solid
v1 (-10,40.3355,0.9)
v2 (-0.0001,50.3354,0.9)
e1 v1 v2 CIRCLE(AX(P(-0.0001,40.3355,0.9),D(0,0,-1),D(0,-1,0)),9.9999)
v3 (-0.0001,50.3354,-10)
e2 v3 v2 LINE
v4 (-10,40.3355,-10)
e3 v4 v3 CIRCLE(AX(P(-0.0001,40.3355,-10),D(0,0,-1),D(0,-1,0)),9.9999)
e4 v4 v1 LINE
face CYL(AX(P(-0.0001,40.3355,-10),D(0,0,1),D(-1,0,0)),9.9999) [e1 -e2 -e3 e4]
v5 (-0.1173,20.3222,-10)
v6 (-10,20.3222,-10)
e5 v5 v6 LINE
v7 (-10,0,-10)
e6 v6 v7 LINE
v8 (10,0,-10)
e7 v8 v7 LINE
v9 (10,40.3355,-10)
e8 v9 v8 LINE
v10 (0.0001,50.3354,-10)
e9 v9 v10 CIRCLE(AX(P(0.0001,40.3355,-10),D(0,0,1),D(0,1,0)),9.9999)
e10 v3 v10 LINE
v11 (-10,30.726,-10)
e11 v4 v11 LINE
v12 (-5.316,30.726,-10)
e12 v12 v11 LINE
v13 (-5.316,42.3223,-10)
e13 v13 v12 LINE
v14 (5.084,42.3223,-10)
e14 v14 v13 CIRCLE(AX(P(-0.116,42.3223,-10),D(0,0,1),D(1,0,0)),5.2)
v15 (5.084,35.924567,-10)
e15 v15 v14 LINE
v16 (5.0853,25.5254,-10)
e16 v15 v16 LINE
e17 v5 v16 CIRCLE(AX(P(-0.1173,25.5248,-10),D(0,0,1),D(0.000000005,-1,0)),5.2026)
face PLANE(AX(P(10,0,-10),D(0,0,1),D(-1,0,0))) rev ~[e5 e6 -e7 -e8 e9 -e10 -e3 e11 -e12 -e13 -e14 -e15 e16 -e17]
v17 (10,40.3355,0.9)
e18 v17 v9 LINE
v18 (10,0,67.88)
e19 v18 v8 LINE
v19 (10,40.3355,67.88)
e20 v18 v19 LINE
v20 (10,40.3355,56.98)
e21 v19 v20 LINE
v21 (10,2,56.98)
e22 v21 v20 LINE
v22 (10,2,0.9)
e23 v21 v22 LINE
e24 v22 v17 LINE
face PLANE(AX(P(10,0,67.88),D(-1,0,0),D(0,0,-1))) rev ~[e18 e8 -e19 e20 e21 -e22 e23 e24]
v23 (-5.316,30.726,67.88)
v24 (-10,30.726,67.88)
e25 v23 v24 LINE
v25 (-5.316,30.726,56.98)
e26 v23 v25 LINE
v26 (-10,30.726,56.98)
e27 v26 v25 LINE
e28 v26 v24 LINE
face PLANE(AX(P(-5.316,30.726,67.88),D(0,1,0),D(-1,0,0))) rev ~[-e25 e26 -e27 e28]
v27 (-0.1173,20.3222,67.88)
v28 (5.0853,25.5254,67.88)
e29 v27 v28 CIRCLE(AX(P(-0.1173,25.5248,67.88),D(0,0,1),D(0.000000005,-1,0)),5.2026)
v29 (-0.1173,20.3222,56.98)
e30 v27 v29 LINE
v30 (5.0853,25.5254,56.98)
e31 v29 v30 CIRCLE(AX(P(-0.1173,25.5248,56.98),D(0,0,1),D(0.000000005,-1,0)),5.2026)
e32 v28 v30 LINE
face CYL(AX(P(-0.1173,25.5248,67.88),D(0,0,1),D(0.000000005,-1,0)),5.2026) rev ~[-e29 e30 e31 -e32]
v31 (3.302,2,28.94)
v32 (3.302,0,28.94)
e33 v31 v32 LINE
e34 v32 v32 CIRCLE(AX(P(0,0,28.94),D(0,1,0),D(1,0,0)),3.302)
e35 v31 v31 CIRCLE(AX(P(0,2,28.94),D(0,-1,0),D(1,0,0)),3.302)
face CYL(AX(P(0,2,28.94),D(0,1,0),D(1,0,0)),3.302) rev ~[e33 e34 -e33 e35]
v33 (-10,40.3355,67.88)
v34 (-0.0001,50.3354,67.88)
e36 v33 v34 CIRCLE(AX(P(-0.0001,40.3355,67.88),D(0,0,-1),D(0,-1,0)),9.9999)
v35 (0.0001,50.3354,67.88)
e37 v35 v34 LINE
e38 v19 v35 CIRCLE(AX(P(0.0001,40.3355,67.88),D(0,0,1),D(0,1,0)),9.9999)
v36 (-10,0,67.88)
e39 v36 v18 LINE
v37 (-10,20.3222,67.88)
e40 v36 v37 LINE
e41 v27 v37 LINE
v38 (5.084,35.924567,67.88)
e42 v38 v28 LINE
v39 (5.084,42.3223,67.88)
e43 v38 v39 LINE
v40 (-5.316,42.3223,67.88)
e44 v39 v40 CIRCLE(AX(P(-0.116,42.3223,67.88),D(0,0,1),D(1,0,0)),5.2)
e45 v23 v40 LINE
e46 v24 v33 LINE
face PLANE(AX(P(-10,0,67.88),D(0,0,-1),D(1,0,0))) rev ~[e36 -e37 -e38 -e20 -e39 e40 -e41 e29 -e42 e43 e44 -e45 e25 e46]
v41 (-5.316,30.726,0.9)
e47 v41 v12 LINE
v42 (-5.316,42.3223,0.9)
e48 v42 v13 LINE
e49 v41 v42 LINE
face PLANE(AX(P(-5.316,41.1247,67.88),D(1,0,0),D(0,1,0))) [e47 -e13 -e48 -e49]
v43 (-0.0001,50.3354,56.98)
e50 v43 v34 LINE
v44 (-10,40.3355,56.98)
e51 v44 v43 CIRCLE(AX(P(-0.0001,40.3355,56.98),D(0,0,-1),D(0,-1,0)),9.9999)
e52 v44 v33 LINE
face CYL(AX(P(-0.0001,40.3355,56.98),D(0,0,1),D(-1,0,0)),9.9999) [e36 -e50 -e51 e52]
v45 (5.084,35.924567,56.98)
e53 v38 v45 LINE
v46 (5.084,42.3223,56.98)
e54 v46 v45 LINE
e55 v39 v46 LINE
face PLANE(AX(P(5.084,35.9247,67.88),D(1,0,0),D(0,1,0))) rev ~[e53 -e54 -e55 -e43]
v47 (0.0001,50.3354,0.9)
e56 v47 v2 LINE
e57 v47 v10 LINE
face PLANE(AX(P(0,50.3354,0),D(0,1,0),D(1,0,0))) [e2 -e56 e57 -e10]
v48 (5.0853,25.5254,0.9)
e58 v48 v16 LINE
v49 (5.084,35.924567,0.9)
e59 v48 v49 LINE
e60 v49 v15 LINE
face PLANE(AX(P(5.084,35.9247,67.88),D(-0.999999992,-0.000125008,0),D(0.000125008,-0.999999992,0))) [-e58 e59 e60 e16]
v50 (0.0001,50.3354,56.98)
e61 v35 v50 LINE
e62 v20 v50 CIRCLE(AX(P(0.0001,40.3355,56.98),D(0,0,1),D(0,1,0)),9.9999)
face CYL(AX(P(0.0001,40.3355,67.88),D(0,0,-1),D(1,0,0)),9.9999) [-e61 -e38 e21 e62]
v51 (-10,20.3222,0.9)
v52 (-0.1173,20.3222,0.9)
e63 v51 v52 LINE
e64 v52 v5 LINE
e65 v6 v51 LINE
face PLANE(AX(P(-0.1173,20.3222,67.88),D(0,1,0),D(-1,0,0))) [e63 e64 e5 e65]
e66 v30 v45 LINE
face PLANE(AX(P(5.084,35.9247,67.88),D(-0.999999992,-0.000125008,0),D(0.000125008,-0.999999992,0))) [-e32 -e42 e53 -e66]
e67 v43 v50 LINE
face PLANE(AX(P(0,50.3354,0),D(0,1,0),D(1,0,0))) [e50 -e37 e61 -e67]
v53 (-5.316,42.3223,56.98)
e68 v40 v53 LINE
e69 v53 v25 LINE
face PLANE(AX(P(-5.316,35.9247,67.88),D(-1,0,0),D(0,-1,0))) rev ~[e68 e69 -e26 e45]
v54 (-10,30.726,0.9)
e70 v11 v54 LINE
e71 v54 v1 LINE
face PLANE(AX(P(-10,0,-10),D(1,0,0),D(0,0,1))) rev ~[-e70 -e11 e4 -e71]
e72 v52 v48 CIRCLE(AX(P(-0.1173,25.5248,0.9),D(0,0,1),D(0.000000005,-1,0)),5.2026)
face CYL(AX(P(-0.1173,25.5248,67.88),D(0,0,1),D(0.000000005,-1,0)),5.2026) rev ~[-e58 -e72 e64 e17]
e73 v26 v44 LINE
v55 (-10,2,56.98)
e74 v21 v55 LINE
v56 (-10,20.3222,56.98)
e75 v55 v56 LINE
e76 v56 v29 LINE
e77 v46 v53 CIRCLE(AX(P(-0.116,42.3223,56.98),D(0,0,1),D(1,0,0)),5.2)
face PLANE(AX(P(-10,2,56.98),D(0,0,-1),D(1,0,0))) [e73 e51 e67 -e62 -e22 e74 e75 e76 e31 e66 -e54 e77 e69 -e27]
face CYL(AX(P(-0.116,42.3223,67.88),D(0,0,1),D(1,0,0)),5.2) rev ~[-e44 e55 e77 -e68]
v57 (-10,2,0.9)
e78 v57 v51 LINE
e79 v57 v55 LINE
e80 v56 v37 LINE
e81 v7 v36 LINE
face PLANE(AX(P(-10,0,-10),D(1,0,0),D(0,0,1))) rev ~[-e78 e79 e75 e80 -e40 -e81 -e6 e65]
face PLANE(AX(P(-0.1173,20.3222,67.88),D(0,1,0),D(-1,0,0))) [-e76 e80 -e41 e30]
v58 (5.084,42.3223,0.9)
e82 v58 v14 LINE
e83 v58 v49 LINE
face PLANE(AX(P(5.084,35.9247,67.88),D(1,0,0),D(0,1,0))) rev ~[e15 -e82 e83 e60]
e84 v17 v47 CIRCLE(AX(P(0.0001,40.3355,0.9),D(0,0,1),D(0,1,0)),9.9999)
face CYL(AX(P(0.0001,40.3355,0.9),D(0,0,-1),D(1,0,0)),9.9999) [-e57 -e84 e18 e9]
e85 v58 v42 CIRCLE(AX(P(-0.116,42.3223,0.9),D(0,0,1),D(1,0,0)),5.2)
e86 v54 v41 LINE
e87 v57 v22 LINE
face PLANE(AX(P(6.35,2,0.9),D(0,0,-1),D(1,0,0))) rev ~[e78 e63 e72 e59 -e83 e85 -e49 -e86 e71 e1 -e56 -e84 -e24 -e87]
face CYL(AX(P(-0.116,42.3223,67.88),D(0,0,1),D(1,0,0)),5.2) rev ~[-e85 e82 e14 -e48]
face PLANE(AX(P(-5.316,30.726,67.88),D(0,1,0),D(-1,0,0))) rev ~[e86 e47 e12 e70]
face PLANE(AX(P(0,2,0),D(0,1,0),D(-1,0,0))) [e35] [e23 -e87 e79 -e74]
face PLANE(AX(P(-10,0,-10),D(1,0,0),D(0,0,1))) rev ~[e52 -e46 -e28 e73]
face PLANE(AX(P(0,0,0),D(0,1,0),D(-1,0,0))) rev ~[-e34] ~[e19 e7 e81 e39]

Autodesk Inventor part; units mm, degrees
ref_plane "YZ Plane" through (0, 0, 0) normal (1, 0, 0) x (0, 1, 0)
ref_plane "XZ Plane" through (0, 0, 0) normal (0, 1, 0) x (-1, 0, 0)
ref_plane "XY Plane" through (0, 0, 0) normal (0, 0, 1) x (1, 0, 0)
sketch "Sketch1" plane through (0, 0, 0) normal (0, 1, 0) x (-1, 0, 0)
  line L0 (10, 67.88) -> (-10, 67.88)
  line L1 (-10, 67.88) -> (-10, -10)
  line L2 (-10, -10) -> (10, -10)
  line L3 (10, -10) -> (10, 67.88)
  point P0 (0, 0)
  dimension "d0" = 20
  dimension "d1" = 77.88
extrude "Extrusion1" add sketch "Sketch1" along normal blind 2
sketch "Sketch2" plane through (0, 2, 0) normal (0, 1, 0) x (1, 0, 0)
  line L0 (-10, -67.88) -> (10, -67.88) projected
  line L1 (0, -67.88) -> (-6.35, -67.88)
  line L2 (-6.35, -56.98) -> (6.35, -56.98)
  line L3 (6.35, -67.88) -> (0, -67.88)
  line L4 (10, 10) -> (-10, 10) projected
  line L5 (-6.35, -0.9) -> (6.35, -0.9)
  line L6 (-6.35, 10) -> (6.35, 10)
  line L7 (-6.35, -67.88) -> (-10, -67.88)
  line L8 (-10, 10) -> (-10, -67.88) projected
  line L9 (-10, -56.98) -> (-6.35, -56.98)
  line L10 (6.35, -67.88) -> (10, -67.88)
  line L11 (10, -67.88) -> (10, 10) projected
  line L12 (10, -56.98) -> (6.35, -56.98)
  line L13 (6.35, -0.9) -> (10, -0.9)
  line L14 (10, 10) -> (6.35, 10)
  line L15 (10, -0.9) -> (10, 10)
  line L16 (10, -67.88) -> (10, -56.98)
  line L17 (-10, -67.88) -> (-10, -56.98)
  line L18 (-6.35, -0.9) -> (-10, -0.9)
  line L19 (-10, -0.9) -> (-10, 10)
  line L20 (-10, 10) -> (-6.35, 10)
  point P0 (0, 0)
  dimension "d4" = 6.35
  dimension "d5" = 10.9
  dimension "d6" = 12.7
  dimension "d7" = 10.9
extrude "Extrusion2" add sketch "Sketch2" along normal blind 48.3354 contours L8 L9 L2 L12 L11 L0 | L8 L4 L11 L13 L5 L18
sketch "Sketch9" plane through (-10, 0, 67.88) normal (0, 0, 1) x (1, 0, 0)
  arc A0 (15.084, 42.3223) -> (4.684, 42.3223) centre (9.884, 42.3223) ccw
  line L0 (15.084, 35.9247) -> (15.084, 42.3223)
  line L1 (4.684, 41.1247) -> (4.684, 42.3223)
  arc A1 (15.084, 42.3223) -> (4.684, 42.3223) centre (9.884, 42.3223) ccw
  line L2 (4.684, 42.3223) -> (4.684, 35.9247)
  line L3 (9.8827, 20.3222) -> (-0.0013, 20.3222)
  line L4 (-0.0013, 30.726) -> (-0.0013, 20.3222)
  line L5 (4.684, 35.9247) -> (4.684, 30.726)
  line L6 (15.084, 35.9247) -> (15.0853, 25.5254)
  arc A2 (15.084, 35.9247) -> (15.084, 35.9251) centre (9.884, 35.9243) ccw
  line L7 (4.684, 30.726) -> (-0.0013, 30.726)
  arc A3 (9.8827, 20.3222) -> (15.0853, 25.5254) centre (9.8827, 25.5248) ccw
  point P0 (10, 0)
fillet "Fillet4" radius 10 4 edges at (10, 50.3354, 62.43) (-10, 50.3354, 62.43) (-10, 50.3354, -4.55) (10, 50.3354, -4.55)
sketch "Sketch10" plane through (0, 2, 0) normal (0, 1, 0) x (1, 0, 0)
  line L0 (10, -67.88) -> (-10, -67.88) projected
  line L1 (-10, 10) -> (10, 10) projected
  line L2 (10, -56.98) -> (10, -0.9) projected
  line L3 (-10, -0.9) -> (-10, -56.98) projected
  line L4 (10, -28.94) -> (-10, -28.94)
  circle A0 centre (0, -28.94) radius 3.302
  point P0 (0, 0)
  dimension "d53" = 77.88
  dimension "d54" = 6.604
extrude "Extrusion10" cut sketch "Sketch10" against normal blind 2
extrude "Extrusion11" cut sketch "Sketch9" against normal through all
properties part number "6 Backet Adjustment"
